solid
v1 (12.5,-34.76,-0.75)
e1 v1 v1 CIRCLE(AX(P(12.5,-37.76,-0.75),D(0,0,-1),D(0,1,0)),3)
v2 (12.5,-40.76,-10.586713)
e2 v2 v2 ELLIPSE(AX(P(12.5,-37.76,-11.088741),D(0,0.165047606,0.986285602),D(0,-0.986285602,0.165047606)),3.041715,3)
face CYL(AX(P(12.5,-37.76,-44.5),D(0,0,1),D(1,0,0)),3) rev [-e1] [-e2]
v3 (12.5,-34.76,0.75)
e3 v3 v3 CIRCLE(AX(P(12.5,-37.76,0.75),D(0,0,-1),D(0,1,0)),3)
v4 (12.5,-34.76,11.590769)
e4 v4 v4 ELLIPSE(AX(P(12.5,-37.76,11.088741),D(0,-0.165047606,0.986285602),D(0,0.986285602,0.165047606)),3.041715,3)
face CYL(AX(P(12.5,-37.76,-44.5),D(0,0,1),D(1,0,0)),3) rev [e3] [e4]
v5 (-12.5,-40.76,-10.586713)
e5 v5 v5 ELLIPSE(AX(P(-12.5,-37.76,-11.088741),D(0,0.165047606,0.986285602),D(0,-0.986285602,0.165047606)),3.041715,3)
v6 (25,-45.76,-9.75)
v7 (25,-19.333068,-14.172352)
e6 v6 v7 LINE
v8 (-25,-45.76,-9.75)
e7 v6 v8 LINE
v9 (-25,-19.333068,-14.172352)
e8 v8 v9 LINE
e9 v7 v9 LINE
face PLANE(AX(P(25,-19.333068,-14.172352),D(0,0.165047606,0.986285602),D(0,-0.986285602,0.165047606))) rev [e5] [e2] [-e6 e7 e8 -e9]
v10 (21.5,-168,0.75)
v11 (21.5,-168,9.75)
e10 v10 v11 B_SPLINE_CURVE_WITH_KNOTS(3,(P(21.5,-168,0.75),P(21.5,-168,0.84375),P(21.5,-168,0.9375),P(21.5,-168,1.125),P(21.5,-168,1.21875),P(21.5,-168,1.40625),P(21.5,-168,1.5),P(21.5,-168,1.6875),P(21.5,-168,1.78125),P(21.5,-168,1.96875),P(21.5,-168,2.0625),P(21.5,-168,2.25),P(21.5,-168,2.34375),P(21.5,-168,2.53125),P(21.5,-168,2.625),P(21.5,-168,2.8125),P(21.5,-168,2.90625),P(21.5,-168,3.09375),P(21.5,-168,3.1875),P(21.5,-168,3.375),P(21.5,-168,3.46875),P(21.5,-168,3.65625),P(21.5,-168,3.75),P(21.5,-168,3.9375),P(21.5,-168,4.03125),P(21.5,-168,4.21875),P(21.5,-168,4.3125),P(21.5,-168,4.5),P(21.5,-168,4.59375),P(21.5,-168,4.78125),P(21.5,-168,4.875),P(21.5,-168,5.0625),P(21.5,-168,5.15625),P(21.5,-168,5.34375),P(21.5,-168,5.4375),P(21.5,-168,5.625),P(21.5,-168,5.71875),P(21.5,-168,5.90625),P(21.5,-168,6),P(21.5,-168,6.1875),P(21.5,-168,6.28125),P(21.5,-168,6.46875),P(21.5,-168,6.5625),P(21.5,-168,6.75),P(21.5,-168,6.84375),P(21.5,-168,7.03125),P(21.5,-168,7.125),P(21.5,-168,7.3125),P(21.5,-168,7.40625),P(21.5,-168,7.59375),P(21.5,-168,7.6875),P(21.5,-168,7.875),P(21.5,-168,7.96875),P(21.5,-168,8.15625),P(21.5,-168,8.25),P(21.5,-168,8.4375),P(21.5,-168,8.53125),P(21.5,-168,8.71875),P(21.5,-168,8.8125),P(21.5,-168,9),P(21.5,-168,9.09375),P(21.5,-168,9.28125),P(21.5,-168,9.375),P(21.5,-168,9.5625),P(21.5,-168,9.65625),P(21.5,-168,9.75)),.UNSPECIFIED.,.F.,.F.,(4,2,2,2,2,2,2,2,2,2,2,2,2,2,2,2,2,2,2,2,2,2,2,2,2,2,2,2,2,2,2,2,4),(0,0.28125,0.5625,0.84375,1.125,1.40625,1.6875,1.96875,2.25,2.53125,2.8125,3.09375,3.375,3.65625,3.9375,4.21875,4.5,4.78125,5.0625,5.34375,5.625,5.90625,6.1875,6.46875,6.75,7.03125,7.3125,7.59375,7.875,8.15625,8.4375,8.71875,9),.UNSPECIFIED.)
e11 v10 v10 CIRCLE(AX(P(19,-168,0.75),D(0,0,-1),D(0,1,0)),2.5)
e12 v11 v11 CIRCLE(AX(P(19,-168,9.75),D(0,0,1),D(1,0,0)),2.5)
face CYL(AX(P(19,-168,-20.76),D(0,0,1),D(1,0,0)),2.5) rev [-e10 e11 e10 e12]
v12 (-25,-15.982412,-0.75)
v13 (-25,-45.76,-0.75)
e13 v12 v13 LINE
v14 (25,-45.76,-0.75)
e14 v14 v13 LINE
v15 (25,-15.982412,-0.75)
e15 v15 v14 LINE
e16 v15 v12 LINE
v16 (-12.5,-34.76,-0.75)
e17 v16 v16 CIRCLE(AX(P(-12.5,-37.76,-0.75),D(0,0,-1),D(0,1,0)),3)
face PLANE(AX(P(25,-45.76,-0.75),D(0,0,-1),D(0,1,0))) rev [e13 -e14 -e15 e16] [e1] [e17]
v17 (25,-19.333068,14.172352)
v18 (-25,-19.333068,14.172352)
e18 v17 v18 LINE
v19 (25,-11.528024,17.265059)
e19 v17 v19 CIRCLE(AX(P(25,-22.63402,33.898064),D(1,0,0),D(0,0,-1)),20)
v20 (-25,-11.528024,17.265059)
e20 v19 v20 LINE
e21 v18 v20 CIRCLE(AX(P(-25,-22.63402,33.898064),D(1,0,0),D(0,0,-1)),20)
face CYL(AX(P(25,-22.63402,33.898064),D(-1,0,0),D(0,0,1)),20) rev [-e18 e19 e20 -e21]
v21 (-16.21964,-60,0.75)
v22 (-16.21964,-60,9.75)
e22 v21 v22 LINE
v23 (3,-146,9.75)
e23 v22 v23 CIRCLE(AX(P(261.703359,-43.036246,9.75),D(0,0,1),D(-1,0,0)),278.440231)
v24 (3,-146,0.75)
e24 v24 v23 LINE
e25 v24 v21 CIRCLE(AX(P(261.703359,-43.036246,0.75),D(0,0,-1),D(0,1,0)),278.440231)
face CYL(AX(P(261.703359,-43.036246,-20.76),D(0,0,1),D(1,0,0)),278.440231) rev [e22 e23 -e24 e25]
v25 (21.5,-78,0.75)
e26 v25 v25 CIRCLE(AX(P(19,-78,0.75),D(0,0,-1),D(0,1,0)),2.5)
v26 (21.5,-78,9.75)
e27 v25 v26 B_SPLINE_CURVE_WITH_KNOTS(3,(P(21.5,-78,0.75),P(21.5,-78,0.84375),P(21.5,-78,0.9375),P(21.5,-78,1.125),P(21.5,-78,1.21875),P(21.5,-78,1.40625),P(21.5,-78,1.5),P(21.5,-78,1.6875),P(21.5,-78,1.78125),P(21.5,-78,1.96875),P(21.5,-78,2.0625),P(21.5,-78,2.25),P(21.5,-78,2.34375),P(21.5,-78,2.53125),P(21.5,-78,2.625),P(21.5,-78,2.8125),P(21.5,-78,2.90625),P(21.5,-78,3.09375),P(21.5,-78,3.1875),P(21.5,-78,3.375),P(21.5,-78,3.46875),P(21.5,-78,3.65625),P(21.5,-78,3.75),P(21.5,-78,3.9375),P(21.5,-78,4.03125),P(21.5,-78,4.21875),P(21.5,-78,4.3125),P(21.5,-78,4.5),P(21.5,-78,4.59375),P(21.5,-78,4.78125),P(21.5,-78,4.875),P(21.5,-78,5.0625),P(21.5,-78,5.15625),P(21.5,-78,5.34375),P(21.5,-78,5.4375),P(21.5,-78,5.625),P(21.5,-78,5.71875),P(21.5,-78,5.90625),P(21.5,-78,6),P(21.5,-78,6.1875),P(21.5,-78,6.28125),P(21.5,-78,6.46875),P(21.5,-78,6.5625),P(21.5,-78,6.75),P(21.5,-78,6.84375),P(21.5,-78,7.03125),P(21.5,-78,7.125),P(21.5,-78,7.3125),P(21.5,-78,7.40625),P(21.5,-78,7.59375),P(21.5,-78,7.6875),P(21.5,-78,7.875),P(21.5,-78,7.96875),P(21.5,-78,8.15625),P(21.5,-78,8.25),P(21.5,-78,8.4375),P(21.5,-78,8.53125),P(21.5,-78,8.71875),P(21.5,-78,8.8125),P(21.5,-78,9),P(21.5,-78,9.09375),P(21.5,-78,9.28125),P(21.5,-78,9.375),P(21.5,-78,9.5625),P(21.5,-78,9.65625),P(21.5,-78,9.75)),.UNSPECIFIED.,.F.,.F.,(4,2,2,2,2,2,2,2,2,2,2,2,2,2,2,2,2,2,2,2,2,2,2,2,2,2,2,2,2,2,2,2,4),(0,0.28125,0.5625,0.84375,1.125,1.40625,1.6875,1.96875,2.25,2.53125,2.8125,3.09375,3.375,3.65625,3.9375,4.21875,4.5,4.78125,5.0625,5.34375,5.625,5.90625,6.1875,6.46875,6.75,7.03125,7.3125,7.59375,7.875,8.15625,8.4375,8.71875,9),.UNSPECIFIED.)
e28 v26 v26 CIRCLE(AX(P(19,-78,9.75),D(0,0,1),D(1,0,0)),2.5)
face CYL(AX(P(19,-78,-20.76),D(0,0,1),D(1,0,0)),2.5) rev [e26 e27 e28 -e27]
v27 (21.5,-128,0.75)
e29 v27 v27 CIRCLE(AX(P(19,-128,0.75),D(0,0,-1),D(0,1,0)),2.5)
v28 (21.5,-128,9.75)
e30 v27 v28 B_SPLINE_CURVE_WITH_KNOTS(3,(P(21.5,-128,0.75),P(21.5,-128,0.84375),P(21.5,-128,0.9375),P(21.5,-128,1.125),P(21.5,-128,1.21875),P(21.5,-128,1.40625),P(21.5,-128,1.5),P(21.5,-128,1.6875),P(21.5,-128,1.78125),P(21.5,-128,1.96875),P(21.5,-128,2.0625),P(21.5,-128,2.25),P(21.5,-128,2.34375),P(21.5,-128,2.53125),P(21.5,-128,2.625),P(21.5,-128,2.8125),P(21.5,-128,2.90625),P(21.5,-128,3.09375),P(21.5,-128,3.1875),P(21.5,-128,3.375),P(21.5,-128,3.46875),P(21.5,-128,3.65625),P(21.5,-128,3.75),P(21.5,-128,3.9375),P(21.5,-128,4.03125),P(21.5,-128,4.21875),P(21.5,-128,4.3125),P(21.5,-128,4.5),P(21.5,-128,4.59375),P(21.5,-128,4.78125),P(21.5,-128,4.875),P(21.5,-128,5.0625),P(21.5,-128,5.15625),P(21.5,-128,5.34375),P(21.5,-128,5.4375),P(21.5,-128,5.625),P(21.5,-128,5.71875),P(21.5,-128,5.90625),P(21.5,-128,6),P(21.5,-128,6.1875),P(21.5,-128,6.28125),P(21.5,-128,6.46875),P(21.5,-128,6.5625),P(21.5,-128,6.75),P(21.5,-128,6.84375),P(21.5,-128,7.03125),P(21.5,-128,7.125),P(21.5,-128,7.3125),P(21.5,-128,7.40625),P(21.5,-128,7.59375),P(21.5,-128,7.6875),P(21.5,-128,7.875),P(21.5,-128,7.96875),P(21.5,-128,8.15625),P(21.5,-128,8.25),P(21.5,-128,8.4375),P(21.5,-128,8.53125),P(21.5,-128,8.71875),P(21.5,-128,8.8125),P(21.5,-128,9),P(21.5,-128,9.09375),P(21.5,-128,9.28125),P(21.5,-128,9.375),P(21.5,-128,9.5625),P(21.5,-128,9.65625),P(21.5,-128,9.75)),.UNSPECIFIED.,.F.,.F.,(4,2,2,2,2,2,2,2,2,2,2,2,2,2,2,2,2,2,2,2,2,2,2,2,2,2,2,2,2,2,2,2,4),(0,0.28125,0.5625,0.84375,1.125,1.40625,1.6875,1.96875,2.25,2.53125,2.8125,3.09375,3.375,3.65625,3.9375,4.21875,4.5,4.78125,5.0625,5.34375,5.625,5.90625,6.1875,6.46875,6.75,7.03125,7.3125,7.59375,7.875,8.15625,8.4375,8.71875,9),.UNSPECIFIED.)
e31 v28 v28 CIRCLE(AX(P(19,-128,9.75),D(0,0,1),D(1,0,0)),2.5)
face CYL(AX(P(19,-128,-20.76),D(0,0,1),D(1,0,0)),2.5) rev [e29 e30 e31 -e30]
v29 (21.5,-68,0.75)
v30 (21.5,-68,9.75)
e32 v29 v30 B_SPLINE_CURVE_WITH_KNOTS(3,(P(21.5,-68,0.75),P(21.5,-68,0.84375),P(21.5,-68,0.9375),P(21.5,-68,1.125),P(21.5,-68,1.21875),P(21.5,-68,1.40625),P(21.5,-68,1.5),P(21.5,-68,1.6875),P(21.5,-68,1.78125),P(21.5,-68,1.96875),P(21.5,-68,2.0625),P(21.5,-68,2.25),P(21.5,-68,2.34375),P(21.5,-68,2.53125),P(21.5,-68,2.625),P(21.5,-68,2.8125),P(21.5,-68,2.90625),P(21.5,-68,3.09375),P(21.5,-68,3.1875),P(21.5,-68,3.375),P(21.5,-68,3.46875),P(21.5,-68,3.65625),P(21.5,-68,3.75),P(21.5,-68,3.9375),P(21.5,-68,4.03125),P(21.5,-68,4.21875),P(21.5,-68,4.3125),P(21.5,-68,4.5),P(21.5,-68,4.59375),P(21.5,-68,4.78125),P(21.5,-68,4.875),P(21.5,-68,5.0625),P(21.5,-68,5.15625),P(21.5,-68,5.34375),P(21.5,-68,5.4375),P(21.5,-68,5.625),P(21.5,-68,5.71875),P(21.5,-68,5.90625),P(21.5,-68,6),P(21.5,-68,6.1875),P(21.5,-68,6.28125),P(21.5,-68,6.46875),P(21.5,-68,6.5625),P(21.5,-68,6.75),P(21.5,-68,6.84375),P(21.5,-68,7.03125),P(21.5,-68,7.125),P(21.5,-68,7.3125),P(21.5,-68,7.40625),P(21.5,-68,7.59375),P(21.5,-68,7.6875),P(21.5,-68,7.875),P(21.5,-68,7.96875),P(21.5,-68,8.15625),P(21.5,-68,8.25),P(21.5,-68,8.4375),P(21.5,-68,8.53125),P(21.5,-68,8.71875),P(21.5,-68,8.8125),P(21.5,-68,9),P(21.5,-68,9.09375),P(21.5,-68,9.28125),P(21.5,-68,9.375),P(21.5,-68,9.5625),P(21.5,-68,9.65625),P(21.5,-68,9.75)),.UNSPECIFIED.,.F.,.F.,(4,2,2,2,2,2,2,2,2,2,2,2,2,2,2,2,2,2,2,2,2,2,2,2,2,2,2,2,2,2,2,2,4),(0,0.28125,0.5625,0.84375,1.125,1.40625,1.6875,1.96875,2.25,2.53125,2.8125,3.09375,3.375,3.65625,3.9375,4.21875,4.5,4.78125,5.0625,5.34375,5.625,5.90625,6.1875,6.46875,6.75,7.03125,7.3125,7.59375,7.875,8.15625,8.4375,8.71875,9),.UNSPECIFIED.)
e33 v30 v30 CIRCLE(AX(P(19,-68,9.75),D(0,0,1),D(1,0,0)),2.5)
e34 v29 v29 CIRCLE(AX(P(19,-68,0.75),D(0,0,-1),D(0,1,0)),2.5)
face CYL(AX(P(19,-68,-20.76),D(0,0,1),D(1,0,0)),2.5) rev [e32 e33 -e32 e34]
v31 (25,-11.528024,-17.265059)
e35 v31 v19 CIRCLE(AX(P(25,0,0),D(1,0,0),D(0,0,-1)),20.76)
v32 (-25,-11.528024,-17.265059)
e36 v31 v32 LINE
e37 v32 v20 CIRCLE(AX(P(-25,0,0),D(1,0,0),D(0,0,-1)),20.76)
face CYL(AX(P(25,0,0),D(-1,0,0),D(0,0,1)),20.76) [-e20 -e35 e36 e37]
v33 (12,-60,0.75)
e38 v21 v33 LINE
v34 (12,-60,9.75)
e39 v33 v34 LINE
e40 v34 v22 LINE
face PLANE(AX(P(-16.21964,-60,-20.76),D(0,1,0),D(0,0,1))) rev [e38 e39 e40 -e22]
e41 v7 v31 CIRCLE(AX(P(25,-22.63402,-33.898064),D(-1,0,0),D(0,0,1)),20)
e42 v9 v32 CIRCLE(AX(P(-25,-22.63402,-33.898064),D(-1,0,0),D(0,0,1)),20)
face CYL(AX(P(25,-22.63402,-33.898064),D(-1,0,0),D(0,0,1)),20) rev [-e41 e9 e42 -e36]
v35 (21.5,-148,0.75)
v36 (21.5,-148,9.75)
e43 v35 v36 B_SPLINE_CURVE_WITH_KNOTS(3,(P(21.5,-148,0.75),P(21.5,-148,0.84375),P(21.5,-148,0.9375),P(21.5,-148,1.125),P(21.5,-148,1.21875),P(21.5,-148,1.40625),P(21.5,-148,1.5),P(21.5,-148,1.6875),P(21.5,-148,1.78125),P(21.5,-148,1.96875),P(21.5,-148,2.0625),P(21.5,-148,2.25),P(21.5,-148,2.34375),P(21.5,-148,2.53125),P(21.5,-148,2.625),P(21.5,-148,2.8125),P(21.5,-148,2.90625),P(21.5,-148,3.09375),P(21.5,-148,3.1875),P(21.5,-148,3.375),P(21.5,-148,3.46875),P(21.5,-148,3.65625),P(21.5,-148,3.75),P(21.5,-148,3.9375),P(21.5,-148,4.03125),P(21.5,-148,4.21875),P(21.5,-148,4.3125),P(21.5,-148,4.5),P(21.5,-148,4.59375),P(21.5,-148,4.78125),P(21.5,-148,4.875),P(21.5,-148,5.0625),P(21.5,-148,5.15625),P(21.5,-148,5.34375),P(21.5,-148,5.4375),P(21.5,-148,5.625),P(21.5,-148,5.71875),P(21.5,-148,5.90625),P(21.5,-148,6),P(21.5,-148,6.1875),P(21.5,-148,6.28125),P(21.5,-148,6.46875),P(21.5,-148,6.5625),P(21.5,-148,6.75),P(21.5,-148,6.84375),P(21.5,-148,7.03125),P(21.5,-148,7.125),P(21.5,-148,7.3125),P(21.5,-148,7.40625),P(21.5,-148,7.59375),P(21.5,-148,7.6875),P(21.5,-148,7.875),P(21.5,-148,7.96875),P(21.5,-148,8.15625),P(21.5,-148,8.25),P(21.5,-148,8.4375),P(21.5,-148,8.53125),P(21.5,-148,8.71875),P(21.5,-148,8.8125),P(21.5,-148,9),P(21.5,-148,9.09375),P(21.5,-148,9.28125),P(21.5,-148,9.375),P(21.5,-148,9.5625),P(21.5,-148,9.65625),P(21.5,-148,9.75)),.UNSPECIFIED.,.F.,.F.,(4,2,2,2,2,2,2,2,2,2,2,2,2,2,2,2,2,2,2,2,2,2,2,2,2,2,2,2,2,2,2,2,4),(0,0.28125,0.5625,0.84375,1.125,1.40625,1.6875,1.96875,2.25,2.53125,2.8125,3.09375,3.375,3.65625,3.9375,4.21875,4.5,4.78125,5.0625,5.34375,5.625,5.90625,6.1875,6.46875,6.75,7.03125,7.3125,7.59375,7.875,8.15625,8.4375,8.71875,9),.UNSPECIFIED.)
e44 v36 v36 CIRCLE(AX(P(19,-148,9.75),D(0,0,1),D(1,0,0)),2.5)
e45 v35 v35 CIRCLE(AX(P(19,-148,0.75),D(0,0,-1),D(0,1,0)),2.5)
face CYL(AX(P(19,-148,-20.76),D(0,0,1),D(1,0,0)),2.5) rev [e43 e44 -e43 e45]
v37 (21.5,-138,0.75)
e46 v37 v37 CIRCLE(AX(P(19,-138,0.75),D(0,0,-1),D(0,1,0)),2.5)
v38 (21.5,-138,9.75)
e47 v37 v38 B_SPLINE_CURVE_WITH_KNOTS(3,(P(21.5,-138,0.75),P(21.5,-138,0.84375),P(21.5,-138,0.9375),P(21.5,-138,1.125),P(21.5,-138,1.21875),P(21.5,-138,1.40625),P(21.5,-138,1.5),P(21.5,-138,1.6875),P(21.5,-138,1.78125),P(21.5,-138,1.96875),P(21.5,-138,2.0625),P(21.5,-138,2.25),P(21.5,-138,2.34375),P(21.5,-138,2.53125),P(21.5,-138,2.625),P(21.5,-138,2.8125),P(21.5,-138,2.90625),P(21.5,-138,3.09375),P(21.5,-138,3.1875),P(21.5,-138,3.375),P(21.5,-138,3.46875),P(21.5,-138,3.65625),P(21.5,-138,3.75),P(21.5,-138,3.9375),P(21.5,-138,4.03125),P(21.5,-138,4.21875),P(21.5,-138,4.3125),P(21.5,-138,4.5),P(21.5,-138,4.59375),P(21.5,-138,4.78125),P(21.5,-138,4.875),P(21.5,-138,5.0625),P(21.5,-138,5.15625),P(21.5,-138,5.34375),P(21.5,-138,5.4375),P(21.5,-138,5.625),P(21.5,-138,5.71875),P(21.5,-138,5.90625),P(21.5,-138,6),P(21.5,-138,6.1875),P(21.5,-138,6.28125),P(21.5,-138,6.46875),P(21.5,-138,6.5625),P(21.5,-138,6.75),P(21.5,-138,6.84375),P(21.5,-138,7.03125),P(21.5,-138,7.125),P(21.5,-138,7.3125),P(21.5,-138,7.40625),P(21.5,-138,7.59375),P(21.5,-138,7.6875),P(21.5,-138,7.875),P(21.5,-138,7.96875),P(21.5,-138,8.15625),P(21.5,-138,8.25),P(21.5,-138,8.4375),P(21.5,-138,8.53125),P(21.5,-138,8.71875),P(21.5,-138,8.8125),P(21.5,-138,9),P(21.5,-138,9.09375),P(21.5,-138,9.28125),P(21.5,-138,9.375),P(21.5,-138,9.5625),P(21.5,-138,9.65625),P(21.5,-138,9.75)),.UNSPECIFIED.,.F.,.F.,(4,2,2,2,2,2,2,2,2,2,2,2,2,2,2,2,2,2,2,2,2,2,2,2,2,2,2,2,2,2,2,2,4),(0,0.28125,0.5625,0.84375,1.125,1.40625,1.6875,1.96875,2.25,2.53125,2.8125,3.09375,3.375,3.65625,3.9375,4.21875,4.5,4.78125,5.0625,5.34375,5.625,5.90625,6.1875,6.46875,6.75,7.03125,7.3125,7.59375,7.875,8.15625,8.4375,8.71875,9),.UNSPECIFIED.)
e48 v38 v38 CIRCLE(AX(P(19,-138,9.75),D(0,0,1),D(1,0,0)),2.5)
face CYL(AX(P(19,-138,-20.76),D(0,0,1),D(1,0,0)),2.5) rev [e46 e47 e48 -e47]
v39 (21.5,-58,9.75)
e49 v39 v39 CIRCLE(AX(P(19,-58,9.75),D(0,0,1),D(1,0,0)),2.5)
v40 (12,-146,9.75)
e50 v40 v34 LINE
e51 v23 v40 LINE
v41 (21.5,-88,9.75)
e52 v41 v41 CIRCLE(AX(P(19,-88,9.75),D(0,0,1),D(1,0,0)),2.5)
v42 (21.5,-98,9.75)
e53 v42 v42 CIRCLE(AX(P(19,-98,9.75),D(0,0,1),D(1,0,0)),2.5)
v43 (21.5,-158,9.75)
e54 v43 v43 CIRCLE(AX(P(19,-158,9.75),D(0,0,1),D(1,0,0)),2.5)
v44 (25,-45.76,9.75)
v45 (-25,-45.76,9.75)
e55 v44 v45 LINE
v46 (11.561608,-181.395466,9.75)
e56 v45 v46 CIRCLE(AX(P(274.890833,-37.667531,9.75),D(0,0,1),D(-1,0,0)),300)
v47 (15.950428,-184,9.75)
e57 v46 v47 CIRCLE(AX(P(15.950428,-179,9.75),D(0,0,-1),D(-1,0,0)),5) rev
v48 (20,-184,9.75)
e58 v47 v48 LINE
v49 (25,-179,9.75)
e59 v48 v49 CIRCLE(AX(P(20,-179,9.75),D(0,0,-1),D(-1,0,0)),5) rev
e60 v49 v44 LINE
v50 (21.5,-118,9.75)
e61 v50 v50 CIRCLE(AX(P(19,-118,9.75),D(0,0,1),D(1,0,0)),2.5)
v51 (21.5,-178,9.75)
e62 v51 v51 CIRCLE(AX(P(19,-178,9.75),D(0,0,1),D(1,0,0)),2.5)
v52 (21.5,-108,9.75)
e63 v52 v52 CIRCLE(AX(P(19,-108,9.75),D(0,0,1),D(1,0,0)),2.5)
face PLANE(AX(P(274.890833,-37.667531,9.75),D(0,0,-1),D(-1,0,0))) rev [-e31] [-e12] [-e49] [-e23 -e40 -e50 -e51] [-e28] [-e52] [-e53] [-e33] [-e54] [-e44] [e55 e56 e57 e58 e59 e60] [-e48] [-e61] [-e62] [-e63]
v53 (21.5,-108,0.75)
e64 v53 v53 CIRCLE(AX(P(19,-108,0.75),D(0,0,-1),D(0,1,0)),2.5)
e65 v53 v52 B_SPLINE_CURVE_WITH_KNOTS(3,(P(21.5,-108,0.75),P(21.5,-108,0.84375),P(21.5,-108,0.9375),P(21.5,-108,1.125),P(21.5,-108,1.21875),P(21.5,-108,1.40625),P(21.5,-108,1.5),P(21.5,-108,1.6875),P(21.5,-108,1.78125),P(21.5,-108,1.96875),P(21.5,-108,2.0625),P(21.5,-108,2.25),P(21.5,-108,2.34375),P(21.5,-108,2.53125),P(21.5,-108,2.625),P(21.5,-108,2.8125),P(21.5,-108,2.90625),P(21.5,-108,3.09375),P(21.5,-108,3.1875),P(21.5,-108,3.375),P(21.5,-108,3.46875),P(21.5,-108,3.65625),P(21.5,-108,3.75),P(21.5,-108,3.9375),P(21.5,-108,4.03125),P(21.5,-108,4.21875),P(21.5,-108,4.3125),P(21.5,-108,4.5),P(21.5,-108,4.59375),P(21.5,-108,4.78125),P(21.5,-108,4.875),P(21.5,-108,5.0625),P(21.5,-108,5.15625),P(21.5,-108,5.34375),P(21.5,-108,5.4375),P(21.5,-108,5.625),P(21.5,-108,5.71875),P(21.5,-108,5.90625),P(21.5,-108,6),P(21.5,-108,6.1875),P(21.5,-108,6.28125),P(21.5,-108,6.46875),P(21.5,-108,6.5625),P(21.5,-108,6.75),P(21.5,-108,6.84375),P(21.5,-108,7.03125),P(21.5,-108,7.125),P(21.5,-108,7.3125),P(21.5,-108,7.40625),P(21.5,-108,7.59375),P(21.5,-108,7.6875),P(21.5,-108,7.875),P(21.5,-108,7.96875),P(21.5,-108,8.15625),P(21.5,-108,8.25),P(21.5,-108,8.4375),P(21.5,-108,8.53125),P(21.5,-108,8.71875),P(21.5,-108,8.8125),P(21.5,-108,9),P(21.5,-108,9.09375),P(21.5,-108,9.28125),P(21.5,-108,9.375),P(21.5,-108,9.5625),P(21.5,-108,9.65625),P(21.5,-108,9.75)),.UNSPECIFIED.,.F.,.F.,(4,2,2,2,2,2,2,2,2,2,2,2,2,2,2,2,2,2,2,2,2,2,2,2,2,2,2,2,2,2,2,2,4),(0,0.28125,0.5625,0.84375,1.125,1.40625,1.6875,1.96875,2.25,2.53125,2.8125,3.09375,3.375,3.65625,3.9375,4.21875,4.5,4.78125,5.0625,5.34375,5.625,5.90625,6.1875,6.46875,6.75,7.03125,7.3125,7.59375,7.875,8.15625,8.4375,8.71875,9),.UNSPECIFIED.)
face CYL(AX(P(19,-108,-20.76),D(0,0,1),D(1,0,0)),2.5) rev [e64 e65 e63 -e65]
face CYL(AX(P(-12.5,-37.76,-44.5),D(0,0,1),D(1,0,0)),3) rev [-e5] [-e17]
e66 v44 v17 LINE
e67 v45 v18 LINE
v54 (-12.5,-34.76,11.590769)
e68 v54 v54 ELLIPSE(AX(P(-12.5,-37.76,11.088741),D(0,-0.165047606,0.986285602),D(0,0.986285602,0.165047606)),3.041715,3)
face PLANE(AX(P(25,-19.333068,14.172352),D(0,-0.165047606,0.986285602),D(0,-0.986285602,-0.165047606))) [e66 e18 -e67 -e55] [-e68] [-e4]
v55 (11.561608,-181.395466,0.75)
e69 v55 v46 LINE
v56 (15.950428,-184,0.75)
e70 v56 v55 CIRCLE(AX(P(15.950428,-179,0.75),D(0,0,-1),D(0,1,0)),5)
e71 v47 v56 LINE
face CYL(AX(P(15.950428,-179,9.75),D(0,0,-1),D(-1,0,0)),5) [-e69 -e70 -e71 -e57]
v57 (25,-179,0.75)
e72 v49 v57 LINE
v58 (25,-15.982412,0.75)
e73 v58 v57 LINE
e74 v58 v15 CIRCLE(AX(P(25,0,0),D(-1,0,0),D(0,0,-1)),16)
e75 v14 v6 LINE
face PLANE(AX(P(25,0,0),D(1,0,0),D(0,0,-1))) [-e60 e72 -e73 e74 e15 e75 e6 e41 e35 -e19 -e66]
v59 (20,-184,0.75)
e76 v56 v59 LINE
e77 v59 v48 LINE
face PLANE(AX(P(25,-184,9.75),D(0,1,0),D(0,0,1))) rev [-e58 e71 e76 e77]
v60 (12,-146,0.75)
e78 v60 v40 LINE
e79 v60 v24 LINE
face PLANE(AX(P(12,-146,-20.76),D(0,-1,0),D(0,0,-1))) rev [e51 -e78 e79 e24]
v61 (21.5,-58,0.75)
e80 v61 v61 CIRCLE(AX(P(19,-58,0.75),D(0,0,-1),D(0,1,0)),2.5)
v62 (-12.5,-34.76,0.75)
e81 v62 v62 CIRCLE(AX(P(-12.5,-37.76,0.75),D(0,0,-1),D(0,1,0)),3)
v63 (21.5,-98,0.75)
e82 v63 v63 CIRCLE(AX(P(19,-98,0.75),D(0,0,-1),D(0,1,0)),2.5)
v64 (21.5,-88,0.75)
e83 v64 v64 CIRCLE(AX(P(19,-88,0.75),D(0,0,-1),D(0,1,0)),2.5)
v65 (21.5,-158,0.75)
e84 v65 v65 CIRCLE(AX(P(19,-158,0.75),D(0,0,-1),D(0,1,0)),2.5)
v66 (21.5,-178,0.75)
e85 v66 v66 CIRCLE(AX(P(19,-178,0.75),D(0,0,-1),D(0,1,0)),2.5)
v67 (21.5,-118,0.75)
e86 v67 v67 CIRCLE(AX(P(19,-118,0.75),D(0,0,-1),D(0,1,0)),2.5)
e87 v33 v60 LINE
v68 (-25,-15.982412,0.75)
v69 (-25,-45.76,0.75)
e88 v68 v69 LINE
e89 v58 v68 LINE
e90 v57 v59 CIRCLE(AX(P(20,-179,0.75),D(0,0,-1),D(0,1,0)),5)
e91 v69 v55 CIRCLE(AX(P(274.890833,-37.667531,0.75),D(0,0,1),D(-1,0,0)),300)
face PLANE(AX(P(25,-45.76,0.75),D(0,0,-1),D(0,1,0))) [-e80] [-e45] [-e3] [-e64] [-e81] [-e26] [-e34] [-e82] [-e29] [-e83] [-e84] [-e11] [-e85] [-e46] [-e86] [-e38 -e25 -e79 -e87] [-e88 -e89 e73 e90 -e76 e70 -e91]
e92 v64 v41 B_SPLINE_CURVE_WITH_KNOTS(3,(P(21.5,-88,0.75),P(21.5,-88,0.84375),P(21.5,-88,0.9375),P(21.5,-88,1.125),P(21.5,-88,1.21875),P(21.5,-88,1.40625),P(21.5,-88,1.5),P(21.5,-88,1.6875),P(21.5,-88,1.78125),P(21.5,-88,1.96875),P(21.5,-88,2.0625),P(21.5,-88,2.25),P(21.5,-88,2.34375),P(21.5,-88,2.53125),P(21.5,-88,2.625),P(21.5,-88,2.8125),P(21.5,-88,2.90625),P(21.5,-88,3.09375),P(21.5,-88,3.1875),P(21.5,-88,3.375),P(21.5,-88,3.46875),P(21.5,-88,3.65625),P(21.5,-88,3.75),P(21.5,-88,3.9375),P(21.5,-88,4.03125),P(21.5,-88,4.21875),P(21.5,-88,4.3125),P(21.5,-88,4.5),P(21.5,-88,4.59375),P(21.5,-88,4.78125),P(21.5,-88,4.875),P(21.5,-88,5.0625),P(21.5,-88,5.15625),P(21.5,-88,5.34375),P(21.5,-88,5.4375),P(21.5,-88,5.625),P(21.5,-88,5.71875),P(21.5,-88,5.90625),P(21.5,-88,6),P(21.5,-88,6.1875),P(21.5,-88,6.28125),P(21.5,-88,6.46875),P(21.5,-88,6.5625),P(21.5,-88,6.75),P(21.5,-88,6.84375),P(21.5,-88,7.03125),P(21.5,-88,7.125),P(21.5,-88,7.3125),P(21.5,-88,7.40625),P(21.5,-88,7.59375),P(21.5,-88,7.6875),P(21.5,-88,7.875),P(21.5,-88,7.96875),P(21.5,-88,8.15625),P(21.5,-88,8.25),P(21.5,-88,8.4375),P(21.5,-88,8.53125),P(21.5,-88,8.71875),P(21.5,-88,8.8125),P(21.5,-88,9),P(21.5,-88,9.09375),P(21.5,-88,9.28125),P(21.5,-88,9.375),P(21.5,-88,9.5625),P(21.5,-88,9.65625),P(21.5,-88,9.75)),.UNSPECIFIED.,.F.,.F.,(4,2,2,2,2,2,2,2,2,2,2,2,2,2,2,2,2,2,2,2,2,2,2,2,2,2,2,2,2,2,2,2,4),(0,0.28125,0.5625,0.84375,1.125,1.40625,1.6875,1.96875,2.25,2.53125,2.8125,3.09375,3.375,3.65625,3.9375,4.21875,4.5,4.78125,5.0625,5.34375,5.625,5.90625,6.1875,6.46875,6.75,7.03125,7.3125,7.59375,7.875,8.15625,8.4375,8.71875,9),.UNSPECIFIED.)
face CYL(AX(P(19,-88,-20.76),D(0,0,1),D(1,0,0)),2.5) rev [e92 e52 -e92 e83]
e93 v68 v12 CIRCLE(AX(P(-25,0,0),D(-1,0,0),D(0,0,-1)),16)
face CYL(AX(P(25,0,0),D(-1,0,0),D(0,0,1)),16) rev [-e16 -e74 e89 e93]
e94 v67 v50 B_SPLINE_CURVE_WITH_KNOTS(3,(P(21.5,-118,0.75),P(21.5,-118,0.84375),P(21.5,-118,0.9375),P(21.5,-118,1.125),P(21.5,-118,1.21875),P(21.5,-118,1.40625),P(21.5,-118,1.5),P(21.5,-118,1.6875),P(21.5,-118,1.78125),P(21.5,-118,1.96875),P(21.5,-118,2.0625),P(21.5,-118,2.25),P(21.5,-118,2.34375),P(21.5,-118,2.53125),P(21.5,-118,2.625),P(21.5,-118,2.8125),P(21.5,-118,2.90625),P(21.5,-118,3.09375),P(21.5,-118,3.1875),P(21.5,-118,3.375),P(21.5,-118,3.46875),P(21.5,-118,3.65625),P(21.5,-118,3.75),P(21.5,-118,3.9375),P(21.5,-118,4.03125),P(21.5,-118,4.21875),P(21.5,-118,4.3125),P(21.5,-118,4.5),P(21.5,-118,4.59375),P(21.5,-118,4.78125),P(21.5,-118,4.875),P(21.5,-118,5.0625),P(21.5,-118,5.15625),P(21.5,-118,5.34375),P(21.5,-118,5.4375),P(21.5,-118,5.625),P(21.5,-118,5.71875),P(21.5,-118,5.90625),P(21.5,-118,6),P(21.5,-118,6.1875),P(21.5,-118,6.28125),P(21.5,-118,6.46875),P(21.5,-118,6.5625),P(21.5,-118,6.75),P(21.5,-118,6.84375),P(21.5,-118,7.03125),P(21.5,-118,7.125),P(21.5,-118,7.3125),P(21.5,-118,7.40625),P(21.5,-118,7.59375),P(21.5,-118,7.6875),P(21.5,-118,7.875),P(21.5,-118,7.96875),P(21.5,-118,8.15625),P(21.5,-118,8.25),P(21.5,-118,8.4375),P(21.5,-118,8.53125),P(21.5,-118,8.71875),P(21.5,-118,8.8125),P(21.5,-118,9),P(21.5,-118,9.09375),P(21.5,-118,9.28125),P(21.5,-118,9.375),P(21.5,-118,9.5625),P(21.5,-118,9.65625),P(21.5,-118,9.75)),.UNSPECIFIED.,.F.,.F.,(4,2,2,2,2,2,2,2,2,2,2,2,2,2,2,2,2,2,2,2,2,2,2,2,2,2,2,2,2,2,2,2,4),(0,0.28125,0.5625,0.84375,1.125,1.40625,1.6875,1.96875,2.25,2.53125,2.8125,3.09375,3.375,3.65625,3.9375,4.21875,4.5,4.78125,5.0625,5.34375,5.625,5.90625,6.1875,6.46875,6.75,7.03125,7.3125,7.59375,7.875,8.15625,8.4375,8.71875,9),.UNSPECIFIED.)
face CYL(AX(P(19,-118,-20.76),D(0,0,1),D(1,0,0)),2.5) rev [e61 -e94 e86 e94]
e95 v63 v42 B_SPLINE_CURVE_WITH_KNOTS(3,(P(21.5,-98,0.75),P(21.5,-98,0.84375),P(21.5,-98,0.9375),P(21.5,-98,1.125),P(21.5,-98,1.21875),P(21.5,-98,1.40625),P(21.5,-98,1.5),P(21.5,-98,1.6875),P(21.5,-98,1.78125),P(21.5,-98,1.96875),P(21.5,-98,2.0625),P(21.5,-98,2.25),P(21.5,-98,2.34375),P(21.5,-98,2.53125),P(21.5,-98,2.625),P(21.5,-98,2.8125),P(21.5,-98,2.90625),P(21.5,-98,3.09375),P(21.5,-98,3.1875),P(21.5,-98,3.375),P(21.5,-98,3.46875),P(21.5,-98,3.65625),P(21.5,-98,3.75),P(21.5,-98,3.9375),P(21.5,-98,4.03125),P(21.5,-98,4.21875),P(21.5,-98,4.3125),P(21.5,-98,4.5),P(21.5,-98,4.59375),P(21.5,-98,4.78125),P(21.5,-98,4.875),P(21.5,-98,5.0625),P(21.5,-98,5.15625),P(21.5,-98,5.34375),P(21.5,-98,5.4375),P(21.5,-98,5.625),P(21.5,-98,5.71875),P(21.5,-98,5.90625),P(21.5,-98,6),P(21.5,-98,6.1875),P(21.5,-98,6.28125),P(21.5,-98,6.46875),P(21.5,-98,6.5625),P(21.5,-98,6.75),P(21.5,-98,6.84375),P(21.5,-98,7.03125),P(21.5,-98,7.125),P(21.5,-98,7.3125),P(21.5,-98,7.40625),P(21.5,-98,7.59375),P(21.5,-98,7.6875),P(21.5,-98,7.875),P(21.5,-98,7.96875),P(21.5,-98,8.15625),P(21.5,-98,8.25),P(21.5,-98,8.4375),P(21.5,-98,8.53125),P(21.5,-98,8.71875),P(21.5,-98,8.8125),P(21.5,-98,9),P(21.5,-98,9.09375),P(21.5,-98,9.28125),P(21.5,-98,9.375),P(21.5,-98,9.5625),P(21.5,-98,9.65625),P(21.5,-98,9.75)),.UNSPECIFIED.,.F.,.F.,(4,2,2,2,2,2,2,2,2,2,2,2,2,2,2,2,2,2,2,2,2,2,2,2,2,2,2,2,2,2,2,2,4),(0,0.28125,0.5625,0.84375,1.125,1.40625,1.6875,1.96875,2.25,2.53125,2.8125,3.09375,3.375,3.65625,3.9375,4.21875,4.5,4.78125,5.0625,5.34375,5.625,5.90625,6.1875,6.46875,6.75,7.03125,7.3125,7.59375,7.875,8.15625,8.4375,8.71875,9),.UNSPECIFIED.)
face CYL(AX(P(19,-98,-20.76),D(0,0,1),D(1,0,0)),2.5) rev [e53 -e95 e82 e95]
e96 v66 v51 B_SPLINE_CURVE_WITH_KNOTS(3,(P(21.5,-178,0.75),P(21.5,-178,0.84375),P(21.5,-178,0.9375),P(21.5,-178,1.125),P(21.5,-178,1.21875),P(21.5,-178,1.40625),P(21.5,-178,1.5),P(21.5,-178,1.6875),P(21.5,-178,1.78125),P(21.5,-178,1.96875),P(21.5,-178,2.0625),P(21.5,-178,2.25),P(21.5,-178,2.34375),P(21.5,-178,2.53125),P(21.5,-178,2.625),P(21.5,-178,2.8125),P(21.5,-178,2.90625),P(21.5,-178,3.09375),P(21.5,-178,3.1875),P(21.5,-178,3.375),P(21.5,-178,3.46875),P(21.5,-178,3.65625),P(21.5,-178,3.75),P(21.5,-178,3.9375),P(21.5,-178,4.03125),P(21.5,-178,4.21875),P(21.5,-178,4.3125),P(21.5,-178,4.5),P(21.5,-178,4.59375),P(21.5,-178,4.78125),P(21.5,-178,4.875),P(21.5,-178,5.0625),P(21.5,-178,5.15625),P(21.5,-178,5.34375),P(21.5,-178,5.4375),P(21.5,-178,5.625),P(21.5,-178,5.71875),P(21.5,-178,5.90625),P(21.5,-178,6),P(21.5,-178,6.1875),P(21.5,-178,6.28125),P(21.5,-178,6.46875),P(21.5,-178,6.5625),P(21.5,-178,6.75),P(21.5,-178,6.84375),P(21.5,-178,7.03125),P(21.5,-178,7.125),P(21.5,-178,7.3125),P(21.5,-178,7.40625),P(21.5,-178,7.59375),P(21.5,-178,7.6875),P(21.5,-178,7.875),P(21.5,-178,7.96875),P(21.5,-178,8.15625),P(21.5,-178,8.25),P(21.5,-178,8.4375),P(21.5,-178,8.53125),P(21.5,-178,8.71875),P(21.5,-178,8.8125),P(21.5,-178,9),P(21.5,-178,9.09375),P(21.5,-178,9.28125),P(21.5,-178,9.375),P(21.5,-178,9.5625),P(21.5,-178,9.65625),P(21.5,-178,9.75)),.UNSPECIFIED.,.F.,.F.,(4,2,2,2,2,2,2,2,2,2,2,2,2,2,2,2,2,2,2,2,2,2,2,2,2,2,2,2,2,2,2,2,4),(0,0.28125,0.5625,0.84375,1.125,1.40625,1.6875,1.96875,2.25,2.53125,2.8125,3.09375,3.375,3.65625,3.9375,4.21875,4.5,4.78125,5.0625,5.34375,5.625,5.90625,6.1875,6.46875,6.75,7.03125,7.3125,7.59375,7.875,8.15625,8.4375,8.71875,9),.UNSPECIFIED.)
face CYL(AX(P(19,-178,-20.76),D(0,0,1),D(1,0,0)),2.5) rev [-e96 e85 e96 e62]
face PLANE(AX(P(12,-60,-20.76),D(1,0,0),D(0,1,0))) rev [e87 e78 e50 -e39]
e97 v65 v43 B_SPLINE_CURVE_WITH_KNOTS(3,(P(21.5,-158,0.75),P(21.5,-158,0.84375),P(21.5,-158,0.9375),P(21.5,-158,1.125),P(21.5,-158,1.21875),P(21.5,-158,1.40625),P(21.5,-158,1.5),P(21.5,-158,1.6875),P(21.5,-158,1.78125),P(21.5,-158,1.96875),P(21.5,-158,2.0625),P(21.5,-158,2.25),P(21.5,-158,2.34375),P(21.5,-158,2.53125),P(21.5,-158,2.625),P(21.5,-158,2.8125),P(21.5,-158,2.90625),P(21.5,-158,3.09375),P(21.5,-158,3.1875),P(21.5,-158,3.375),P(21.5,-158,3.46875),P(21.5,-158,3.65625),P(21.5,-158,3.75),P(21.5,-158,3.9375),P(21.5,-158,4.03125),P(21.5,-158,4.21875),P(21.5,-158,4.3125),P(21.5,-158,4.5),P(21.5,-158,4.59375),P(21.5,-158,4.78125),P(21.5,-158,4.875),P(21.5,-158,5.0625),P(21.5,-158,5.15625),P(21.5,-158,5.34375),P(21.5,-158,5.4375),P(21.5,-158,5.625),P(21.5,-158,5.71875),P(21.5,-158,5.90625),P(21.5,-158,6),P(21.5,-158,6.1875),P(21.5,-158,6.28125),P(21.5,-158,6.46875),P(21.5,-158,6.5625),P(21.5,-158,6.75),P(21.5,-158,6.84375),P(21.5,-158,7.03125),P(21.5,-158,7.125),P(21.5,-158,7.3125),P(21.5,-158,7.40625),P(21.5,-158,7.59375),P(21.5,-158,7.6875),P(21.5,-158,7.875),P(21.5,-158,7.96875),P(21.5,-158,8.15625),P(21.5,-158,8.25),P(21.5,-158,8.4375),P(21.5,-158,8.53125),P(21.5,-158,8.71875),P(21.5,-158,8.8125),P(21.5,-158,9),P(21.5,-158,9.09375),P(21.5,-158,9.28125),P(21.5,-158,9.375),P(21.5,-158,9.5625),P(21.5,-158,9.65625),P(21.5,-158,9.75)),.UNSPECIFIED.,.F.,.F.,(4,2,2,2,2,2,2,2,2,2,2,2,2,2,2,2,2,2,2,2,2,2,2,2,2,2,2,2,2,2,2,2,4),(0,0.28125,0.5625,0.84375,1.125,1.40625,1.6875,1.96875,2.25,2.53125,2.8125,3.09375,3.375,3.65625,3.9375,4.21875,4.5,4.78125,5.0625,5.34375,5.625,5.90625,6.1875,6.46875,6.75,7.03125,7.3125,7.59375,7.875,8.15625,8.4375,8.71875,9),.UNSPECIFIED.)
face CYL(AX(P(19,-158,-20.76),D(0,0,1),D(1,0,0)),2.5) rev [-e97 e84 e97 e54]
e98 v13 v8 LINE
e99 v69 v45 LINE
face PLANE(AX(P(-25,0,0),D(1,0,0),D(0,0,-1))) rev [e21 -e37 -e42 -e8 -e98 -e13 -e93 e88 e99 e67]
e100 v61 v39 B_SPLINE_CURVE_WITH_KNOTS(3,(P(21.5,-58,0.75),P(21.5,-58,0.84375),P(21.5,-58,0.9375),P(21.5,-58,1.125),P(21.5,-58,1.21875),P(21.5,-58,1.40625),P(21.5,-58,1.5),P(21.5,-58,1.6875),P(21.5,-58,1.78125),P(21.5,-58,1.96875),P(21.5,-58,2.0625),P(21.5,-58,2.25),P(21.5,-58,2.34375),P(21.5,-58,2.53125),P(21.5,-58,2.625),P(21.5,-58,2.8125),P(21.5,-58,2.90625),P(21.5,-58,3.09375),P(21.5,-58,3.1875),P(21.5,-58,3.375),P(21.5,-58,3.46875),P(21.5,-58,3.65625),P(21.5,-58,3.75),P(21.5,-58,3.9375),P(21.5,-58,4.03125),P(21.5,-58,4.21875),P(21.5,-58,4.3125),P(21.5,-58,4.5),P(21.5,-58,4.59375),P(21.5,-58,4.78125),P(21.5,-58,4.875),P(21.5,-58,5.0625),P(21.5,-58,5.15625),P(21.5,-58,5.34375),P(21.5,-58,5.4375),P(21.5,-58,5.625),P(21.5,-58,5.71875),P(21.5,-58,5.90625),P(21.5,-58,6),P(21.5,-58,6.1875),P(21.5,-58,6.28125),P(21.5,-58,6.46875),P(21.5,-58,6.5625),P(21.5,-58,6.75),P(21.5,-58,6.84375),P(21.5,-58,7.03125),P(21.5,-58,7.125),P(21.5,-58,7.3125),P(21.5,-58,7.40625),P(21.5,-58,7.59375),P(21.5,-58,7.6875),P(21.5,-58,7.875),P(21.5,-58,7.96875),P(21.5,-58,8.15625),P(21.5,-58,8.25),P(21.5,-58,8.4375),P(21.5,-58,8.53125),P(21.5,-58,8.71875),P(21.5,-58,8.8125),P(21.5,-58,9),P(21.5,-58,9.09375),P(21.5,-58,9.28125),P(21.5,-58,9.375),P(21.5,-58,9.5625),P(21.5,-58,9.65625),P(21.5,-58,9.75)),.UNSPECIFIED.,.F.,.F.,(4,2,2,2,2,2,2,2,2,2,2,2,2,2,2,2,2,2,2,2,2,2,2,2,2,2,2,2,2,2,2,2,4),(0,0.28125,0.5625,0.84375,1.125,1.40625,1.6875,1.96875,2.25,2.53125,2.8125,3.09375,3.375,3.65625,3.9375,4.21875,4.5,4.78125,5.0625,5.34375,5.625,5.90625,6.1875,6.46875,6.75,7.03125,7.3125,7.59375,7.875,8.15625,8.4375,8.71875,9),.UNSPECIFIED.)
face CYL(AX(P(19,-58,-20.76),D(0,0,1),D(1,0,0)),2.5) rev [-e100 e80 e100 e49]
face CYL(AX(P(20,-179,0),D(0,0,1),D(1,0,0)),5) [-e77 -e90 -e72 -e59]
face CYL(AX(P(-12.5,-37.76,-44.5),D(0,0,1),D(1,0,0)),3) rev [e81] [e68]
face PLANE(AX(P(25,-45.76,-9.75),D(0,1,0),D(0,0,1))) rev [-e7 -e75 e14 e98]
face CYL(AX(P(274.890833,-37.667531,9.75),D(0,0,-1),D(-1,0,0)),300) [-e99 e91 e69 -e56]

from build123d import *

# Parameters (mm, degrees)
RESSALTO_EXTRUS_O1_DEPTH = 25
ESPELHAR1_START          = -25
ESPELHAR1_DEPTH          = 50
ESBO_O10_R               = 3
CORTE_EXTRUS_O6_DEPTH    = 44.5
RESSALTO_EXTRUS_O2_START = 0.75
RESSALTO_EXTRUS_O2_DEPTH = 9
ESBO_O12_R               = 2.5
CORTE_EXTRUS_O7_DEPTH    = 189.180392443
PADR_O_LINEAR1_COUNT     = 13
PADR_O_LINEAR1_PITCH     = 10
CORTE_EXTRUS_O8_DEPTH    = 189.180392443
FILETE1_R                = 5


# Read off the part's stored shape, not the designer's step: Espelhar1
with BuildPart() as part:
    # Esboço2 → Ressalto-extrusão1 (new, symmetric)
    with BuildSketch(Plane(origin=(0, 0, 0), x_dir=(0, 0, -1), z_dir=(1, 0, 0))):
        with BuildLine():
            Line((14.172351725, -19.333068153), (9.75, -45.76))
            Line((9.75, -45.76), (0.75, -45.76))
            Line((0.75, -45.76), (0.75, -15.982412208))
            ThreePointArc((0.75, -15.982412208), (15.995602448, 0.375103096), (0, 16))
            Line((0, 16), (0, 20.76))
            ThreePointArc((0, 20.76), (18.307093974, 9.789173112), (17.265058969, -11.528024063))
            ThreePointArc((17.265058969, -11.528024063), (15.304550089, -15.266439288), (14.172351725, -19.333068153))
        make_face()
    extrude(amount=RESSALTO_EXTRUS_O1_DEPTH, both=True)

    # Espelhar1 outline → Espelhar1 (add)
    with BuildSketch(Plane.YZ.offset(ESPELHAR1_START)):
        with BuildLine():
            Line((-19.333068153, 14.172351725), (-45.76, 9.75))
            Line((-45.76, 9.75), (-45.76, 0.75))
            Line((-45.76, 0.75), (-15.982412208, 0.75))
            ThreePointArc((-15.982412208, 0.75), (0.375103096, 15.995602448), (16, 0))
            Line((16, 0), (20.76, 0))
            ThreePointArc((20.76, 0), (9.789173112, 18.307093974), (-11.528024063, 17.265058969))
            ThreePointArc((-11.528024063, 17.265058969), (-15.266439288, 15.304550089), (-19.333068153, 14.172351725))
        make_face()
    extrude(amount=ESPELHAR1_DEPTH)

    # Esboço10 → Corte-extrusão6 (cut, symmetric)
    with BuildSketch(Plane.XY):
        with Locations(Location((-12.5, -37.76, 0), (0, 0, 90))):
            Circle(ESBO_O10_R)
        with Locations(Location((12.5, -37.76, 0), (0, 0, 90))):
            Circle(ESBO_O10_R)
    extrude(amount=CORTE_EXTRUS_O6_DEPTH, both=True, mode=Mode.SUBTRACT)

    # Esboço11 → Ressalto-extrusão2 (add)
    with BuildSketch(Plane.XY.offset(RESSALTO_EXTRUS_O2_START)):
        with BuildLine():
            Line((-25, -45.76), (25, -45.76))
            Line((25, -45.76), (25, -184))
            Line((25, -184), (13, -184))
            ThreePointArc((13, -184), (-14.37934254, -117.183349367), (-25, -45.76))
        make_face()
    extrude(amount=RESSALTO_EXTRUS_O2_DEPTH)

    # Esboço12 → Corte-extrusão7 (cut, through all)
    with BuildSketch(Plane.XY.offset(9.75)):
        with Locations((19, -178)):
            Circle(ESBO_O12_R)
    corte_extrus_o7 = extrude(amount=-CORTE_EXTRUS_O7_DEPTH, mode=Mode.SUBTRACT)

    # Padrão linear1: Corte-extrusão7 ×13
    with Locations(*[(0, i * PADR_O_LINEAR1_PITCH, 0) for i in range(1, PADR_O_LINEAR1_COUNT)]):
        add(corte_extrus_o7, mode=Mode.SUBTRACT)

    # Esboço13 → Corte-extrusão8 (cut, through all)
    with BuildSketch(Plane.XY.offset(9.75)):
        with BuildLine():
            Line((-16.219640416, -60), (12, -60))
            Line((12, -60), (12, -146))
            Line((12, -146), (3, -146))
            ThreePointArc((3, -146), (-10.033576546, -103.765155415), (-16.219640416, -60))
        make_face()
    extrude(amount=-CORTE_EXTRUS_O8_DEPTH, mode=Mode.SUBTRACT)

    # Filete1
    filete1_edges = [part.edges().sort_by_distance(p)[0] for p in [
        (13, -184, 5.25),
        (25, -184, 5.25),
    ]]
    fillet(filete1_edges, radius=FILETE1_R)


solid = part.part
